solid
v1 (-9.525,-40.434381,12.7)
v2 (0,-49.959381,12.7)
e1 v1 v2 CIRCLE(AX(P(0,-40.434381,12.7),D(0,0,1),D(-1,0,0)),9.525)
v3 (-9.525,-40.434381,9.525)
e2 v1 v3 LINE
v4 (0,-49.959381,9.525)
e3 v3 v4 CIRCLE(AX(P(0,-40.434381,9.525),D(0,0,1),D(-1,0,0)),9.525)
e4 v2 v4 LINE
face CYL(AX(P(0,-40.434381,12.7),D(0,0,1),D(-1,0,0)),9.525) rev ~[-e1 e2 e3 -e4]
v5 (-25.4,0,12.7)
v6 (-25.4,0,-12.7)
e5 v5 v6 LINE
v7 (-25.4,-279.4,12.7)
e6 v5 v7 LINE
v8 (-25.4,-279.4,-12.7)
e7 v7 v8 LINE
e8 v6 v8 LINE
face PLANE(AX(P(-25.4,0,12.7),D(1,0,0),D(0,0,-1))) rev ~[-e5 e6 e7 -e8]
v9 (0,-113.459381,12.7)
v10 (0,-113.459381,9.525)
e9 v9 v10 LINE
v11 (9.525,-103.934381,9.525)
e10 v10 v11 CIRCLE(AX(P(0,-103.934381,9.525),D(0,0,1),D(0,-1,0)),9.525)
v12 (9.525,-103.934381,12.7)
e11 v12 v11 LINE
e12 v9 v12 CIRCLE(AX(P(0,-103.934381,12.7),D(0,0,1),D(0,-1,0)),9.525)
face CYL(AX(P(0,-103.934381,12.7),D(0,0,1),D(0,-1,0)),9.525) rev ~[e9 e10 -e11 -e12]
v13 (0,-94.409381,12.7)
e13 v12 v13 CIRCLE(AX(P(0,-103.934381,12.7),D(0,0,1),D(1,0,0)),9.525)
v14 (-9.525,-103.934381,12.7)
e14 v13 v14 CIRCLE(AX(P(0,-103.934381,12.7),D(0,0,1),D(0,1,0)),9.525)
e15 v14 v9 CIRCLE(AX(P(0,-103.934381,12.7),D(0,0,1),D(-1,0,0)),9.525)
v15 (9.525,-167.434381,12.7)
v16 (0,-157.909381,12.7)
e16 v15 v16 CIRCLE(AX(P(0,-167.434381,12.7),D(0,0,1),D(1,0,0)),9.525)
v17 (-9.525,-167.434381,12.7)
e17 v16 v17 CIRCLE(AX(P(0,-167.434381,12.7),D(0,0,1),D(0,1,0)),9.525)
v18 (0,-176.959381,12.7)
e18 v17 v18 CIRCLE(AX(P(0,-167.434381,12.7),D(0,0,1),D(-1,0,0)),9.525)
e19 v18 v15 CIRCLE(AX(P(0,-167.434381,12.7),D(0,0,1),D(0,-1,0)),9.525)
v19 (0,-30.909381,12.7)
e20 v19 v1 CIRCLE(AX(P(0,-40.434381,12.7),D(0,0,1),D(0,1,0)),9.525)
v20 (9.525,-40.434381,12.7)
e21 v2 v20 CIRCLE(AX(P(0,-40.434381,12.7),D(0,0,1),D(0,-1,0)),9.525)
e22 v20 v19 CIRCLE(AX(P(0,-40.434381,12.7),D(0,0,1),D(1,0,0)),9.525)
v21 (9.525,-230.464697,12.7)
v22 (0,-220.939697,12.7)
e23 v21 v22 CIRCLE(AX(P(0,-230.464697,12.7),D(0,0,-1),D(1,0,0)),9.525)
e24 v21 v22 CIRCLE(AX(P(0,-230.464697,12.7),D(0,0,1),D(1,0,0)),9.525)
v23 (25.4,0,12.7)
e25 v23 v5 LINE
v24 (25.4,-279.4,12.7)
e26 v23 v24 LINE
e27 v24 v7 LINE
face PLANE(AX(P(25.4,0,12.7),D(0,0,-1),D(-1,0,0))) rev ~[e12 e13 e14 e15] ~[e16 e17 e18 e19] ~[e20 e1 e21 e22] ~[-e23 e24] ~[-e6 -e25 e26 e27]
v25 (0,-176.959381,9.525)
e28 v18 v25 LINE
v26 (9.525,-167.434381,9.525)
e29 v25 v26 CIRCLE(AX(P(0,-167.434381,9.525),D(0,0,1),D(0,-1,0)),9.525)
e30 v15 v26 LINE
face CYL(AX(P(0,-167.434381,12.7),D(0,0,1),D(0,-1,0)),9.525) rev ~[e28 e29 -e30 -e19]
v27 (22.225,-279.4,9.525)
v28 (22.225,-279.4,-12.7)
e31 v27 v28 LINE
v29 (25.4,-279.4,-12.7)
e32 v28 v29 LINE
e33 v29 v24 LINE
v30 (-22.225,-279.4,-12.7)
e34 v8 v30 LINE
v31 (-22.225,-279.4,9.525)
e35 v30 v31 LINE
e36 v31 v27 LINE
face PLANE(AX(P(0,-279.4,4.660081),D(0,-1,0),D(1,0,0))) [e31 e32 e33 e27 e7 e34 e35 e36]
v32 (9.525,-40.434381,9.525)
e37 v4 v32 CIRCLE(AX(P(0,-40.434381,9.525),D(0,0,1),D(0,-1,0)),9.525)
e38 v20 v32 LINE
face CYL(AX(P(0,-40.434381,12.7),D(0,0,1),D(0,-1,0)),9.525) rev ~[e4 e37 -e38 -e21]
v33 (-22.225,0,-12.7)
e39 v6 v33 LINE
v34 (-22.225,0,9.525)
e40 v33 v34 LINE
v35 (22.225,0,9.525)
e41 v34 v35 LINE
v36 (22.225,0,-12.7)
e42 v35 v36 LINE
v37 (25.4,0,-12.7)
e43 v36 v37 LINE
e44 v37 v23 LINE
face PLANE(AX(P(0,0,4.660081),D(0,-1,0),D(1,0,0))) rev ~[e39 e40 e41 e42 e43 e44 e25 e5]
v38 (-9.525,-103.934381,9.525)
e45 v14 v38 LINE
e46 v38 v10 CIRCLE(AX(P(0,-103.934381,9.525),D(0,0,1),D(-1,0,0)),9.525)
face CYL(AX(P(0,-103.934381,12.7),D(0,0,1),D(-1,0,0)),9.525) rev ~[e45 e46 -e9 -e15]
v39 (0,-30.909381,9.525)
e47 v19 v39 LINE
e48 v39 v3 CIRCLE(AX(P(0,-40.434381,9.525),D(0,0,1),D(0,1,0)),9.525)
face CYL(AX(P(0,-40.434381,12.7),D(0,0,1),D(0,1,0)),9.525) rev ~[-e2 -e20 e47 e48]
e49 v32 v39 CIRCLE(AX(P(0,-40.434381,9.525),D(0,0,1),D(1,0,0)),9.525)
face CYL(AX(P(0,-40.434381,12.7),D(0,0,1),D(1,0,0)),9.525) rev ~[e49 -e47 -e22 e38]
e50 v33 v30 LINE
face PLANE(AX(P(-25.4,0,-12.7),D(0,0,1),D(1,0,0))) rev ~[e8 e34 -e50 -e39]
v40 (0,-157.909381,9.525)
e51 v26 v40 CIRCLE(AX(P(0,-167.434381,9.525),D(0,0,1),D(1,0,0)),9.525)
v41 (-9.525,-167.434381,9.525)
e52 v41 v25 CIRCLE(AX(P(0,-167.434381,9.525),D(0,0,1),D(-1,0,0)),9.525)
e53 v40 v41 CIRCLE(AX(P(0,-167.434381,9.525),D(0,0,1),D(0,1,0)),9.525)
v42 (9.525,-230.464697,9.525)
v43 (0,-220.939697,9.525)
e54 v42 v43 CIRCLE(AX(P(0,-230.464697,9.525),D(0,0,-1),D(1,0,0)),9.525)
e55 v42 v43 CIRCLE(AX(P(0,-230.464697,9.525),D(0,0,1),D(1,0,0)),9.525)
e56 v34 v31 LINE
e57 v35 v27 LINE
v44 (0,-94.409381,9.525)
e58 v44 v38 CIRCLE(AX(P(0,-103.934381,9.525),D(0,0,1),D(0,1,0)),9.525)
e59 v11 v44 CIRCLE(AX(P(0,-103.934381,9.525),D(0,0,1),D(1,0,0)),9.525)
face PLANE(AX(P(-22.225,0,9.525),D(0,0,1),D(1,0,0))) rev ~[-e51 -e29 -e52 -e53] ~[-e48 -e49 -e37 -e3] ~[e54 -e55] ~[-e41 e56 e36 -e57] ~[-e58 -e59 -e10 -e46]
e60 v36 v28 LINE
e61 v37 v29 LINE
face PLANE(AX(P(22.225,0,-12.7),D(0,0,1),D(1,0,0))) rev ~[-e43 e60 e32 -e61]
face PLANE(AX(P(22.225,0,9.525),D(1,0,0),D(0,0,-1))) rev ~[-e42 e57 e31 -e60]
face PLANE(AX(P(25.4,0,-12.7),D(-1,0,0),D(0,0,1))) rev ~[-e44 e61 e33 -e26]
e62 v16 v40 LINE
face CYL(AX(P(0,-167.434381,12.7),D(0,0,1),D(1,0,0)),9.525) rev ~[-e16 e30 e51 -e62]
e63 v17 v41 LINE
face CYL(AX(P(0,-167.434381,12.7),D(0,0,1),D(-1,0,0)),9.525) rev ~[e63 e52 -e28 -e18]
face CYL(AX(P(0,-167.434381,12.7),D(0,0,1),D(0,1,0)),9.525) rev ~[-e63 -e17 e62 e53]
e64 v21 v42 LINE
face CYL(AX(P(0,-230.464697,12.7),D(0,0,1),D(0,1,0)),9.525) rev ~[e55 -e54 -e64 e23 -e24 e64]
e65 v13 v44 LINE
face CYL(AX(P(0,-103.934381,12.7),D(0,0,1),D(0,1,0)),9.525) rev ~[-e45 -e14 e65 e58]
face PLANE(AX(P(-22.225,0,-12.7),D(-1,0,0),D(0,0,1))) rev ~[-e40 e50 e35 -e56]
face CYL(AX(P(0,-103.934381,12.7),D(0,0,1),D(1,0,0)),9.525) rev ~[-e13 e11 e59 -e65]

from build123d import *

# Parameters (mm, degrees)
F1_DEPTH = 279.4
F3_DEPTH = 25.401
F5_D     = 19.05


# Not quite as in the source:
# - a feature names something its author has since deleted; it is built from what else it names


with BuildPart() as f1:
    # F0 (on Front) → F1 (new body)
    with BuildSketch(Plane.XZ):
        Polygon((25.4, -12.7), (25.4, 12.7), (-25.4, 12.7), (-25.4, -12.7), (-22.225, -12.7), (-22.225, 9.525), (22.225, 9.525), (22.225, -12.7), align=None)
    extrude(amount=F1_DEPTH)

    # F2 (on face) → F3 (cut, through all)
    with BuildSketch(Plane.XY.offset(12.7)):
        with BuildLine():
            Line((0, -40.4343813046), (9.525, -40.4343813046))
            ThreePointArc((9.525, -40.4343813046), (6.7351920908, -33.6991892138), (0, -30.9093813046))
            Line((0, -30.9093813046), (0, -40.4343813046))
        make_face()
        with BuildLine():
            ThreePointArc((0, -30.9093813046), (-6.7351920908, -33.6991892138), (-9.525, -40.4343813046))
            Line((-9.525, -40.4343813046), (0, -40.4343813046))
            Line((0, -40.4343813046), (0, -30.9093813046))
        make_face()
        with BuildLine():
            Line((0, -40.4343813046), (-9.525, -40.4343813046))
            ThreePointArc((-9.525, -40.4343813046), (-6.7351920908, -47.1695733954), (0, -49.9593813046))
            Line((0, -49.9593813046), (0, -40.4343813046))
        make_face()
        with BuildLine():
            Line((0, -103.9343813046), (9.525, -103.9343813046))
            ThreePointArc((9.525, -103.9343813046), (6.7351920908, -97.1991892138), (0, -94.4093813046))
            Line((0, -94.4093813046), (0, -103.9343813046))
        make_face()
        with BuildLine():
            ThreePointArc((0, -94.4093813046), (-6.7351920908, -97.1991892138), (-9.525, -103.9343813046))
            Line((-9.525, -103.9343813046), (0, -103.9343813046))
            Line((0, -103.9343813046), (0, -94.4093813046))
        make_face()
        with BuildLine():
            ThreePointArc((0, -113.4593813046), (6.7351920908, -110.6695733954), (9.525, -103.9343813046))
            Line((9.525, -103.9343813046), (0, -103.9343813046))
            Line((0, -103.9343813046), (0, -113.4593813046))
        make_face()
        with BuildLine():
            Line((0, -103.9343813046), (-9.525, -103.9343813046))
            ThreePointArc((-9.525, -103.9343813046), (-6.7351920908, -110.6695733954), (0, -113.4593813046))
            Line((0, -113.4593813046), (0, -103.9343813046))
        make_face()
        with BuildLine():
            Line((0, -167.4343813046), (9.525, -167.4343813046))
            ThreePointArc((9.525, -167.4343813046), (6.7351920908, -160.6991892138), (0, -157.9093813046))
            Line((0, -157.9093813046), (0, -167.4343813046))
        make_face()
        with BuildLine():
            ThreePointArc((0, -157.9093813046), (-6.7351920908, -160.6991892138), (-9.525, -167.4343813046))
            Line((-9.525, -167.4343813046), (0, -167.4343813046))
            Line((0, -167.4343813046), (0, -157.9093813046))
        make_face()
        with BuildLine():
            Line((0, -167.4343813046), (0, -176.9593813046))
            ThreePointArc((0, -176.9593813046), (6.7351920908, -174.1695733954), (9.525, -167.4343813046))
            Line((9.525, -167.4343813046), (0, -167.4343813046))
        make_face()
        with BuildLine():
            ThreePointArc((-9.525, -167.4343813046), (-6.7351920908, -174.1695733954), (0, -176.9593813046))
            Line((0, -176.9593813046), (0, -167.4343813046))
            Line((0, -167.4343813046), (-9.525, -167.4343813046))
        make_face()
        with BuildLine():
            Line((0, -220.9396968842), (0, -230.4646968842))
            Line((0, -230.4646968842), (9.525, -230.4646968842))
            ThreePointArc((9.525, -230.4646968842), (6.7351920908, -223.7295047934), (0, -220.9396968842))
        make_face()
        with BuildLine():
            Line((-9.525, -230.4646968842), (0, -230.4646968842))
            Line((0, -230.4646968842), (0, -220.9396968842))
            ThreePointArc((0, -220.9396968842), (-6.7351920908, -223.7295047934), (-9.525, -230.4646968842))
        make_face()
        with BuildLine():
            ThreePointArc((0, -49.9593813046), (6.7351920908, -47.1695733954), (9.525, -40.4343813046))
            Line((9.525, -40.4343813046), (0, -40.4343813046))
            Line((0, -40.4343813046), (0, -49.9593813046))
        make_face()
    extrude(amount=-F3_DEPTH, mode=Mode.SUBTRACT)

    # F5 (through all)
    with Locations(Plane.XY.offset(12.7)):
        with Locations((0, -230.4646968842)):
            Hole(F5_D / 2)


solid = f1.part
